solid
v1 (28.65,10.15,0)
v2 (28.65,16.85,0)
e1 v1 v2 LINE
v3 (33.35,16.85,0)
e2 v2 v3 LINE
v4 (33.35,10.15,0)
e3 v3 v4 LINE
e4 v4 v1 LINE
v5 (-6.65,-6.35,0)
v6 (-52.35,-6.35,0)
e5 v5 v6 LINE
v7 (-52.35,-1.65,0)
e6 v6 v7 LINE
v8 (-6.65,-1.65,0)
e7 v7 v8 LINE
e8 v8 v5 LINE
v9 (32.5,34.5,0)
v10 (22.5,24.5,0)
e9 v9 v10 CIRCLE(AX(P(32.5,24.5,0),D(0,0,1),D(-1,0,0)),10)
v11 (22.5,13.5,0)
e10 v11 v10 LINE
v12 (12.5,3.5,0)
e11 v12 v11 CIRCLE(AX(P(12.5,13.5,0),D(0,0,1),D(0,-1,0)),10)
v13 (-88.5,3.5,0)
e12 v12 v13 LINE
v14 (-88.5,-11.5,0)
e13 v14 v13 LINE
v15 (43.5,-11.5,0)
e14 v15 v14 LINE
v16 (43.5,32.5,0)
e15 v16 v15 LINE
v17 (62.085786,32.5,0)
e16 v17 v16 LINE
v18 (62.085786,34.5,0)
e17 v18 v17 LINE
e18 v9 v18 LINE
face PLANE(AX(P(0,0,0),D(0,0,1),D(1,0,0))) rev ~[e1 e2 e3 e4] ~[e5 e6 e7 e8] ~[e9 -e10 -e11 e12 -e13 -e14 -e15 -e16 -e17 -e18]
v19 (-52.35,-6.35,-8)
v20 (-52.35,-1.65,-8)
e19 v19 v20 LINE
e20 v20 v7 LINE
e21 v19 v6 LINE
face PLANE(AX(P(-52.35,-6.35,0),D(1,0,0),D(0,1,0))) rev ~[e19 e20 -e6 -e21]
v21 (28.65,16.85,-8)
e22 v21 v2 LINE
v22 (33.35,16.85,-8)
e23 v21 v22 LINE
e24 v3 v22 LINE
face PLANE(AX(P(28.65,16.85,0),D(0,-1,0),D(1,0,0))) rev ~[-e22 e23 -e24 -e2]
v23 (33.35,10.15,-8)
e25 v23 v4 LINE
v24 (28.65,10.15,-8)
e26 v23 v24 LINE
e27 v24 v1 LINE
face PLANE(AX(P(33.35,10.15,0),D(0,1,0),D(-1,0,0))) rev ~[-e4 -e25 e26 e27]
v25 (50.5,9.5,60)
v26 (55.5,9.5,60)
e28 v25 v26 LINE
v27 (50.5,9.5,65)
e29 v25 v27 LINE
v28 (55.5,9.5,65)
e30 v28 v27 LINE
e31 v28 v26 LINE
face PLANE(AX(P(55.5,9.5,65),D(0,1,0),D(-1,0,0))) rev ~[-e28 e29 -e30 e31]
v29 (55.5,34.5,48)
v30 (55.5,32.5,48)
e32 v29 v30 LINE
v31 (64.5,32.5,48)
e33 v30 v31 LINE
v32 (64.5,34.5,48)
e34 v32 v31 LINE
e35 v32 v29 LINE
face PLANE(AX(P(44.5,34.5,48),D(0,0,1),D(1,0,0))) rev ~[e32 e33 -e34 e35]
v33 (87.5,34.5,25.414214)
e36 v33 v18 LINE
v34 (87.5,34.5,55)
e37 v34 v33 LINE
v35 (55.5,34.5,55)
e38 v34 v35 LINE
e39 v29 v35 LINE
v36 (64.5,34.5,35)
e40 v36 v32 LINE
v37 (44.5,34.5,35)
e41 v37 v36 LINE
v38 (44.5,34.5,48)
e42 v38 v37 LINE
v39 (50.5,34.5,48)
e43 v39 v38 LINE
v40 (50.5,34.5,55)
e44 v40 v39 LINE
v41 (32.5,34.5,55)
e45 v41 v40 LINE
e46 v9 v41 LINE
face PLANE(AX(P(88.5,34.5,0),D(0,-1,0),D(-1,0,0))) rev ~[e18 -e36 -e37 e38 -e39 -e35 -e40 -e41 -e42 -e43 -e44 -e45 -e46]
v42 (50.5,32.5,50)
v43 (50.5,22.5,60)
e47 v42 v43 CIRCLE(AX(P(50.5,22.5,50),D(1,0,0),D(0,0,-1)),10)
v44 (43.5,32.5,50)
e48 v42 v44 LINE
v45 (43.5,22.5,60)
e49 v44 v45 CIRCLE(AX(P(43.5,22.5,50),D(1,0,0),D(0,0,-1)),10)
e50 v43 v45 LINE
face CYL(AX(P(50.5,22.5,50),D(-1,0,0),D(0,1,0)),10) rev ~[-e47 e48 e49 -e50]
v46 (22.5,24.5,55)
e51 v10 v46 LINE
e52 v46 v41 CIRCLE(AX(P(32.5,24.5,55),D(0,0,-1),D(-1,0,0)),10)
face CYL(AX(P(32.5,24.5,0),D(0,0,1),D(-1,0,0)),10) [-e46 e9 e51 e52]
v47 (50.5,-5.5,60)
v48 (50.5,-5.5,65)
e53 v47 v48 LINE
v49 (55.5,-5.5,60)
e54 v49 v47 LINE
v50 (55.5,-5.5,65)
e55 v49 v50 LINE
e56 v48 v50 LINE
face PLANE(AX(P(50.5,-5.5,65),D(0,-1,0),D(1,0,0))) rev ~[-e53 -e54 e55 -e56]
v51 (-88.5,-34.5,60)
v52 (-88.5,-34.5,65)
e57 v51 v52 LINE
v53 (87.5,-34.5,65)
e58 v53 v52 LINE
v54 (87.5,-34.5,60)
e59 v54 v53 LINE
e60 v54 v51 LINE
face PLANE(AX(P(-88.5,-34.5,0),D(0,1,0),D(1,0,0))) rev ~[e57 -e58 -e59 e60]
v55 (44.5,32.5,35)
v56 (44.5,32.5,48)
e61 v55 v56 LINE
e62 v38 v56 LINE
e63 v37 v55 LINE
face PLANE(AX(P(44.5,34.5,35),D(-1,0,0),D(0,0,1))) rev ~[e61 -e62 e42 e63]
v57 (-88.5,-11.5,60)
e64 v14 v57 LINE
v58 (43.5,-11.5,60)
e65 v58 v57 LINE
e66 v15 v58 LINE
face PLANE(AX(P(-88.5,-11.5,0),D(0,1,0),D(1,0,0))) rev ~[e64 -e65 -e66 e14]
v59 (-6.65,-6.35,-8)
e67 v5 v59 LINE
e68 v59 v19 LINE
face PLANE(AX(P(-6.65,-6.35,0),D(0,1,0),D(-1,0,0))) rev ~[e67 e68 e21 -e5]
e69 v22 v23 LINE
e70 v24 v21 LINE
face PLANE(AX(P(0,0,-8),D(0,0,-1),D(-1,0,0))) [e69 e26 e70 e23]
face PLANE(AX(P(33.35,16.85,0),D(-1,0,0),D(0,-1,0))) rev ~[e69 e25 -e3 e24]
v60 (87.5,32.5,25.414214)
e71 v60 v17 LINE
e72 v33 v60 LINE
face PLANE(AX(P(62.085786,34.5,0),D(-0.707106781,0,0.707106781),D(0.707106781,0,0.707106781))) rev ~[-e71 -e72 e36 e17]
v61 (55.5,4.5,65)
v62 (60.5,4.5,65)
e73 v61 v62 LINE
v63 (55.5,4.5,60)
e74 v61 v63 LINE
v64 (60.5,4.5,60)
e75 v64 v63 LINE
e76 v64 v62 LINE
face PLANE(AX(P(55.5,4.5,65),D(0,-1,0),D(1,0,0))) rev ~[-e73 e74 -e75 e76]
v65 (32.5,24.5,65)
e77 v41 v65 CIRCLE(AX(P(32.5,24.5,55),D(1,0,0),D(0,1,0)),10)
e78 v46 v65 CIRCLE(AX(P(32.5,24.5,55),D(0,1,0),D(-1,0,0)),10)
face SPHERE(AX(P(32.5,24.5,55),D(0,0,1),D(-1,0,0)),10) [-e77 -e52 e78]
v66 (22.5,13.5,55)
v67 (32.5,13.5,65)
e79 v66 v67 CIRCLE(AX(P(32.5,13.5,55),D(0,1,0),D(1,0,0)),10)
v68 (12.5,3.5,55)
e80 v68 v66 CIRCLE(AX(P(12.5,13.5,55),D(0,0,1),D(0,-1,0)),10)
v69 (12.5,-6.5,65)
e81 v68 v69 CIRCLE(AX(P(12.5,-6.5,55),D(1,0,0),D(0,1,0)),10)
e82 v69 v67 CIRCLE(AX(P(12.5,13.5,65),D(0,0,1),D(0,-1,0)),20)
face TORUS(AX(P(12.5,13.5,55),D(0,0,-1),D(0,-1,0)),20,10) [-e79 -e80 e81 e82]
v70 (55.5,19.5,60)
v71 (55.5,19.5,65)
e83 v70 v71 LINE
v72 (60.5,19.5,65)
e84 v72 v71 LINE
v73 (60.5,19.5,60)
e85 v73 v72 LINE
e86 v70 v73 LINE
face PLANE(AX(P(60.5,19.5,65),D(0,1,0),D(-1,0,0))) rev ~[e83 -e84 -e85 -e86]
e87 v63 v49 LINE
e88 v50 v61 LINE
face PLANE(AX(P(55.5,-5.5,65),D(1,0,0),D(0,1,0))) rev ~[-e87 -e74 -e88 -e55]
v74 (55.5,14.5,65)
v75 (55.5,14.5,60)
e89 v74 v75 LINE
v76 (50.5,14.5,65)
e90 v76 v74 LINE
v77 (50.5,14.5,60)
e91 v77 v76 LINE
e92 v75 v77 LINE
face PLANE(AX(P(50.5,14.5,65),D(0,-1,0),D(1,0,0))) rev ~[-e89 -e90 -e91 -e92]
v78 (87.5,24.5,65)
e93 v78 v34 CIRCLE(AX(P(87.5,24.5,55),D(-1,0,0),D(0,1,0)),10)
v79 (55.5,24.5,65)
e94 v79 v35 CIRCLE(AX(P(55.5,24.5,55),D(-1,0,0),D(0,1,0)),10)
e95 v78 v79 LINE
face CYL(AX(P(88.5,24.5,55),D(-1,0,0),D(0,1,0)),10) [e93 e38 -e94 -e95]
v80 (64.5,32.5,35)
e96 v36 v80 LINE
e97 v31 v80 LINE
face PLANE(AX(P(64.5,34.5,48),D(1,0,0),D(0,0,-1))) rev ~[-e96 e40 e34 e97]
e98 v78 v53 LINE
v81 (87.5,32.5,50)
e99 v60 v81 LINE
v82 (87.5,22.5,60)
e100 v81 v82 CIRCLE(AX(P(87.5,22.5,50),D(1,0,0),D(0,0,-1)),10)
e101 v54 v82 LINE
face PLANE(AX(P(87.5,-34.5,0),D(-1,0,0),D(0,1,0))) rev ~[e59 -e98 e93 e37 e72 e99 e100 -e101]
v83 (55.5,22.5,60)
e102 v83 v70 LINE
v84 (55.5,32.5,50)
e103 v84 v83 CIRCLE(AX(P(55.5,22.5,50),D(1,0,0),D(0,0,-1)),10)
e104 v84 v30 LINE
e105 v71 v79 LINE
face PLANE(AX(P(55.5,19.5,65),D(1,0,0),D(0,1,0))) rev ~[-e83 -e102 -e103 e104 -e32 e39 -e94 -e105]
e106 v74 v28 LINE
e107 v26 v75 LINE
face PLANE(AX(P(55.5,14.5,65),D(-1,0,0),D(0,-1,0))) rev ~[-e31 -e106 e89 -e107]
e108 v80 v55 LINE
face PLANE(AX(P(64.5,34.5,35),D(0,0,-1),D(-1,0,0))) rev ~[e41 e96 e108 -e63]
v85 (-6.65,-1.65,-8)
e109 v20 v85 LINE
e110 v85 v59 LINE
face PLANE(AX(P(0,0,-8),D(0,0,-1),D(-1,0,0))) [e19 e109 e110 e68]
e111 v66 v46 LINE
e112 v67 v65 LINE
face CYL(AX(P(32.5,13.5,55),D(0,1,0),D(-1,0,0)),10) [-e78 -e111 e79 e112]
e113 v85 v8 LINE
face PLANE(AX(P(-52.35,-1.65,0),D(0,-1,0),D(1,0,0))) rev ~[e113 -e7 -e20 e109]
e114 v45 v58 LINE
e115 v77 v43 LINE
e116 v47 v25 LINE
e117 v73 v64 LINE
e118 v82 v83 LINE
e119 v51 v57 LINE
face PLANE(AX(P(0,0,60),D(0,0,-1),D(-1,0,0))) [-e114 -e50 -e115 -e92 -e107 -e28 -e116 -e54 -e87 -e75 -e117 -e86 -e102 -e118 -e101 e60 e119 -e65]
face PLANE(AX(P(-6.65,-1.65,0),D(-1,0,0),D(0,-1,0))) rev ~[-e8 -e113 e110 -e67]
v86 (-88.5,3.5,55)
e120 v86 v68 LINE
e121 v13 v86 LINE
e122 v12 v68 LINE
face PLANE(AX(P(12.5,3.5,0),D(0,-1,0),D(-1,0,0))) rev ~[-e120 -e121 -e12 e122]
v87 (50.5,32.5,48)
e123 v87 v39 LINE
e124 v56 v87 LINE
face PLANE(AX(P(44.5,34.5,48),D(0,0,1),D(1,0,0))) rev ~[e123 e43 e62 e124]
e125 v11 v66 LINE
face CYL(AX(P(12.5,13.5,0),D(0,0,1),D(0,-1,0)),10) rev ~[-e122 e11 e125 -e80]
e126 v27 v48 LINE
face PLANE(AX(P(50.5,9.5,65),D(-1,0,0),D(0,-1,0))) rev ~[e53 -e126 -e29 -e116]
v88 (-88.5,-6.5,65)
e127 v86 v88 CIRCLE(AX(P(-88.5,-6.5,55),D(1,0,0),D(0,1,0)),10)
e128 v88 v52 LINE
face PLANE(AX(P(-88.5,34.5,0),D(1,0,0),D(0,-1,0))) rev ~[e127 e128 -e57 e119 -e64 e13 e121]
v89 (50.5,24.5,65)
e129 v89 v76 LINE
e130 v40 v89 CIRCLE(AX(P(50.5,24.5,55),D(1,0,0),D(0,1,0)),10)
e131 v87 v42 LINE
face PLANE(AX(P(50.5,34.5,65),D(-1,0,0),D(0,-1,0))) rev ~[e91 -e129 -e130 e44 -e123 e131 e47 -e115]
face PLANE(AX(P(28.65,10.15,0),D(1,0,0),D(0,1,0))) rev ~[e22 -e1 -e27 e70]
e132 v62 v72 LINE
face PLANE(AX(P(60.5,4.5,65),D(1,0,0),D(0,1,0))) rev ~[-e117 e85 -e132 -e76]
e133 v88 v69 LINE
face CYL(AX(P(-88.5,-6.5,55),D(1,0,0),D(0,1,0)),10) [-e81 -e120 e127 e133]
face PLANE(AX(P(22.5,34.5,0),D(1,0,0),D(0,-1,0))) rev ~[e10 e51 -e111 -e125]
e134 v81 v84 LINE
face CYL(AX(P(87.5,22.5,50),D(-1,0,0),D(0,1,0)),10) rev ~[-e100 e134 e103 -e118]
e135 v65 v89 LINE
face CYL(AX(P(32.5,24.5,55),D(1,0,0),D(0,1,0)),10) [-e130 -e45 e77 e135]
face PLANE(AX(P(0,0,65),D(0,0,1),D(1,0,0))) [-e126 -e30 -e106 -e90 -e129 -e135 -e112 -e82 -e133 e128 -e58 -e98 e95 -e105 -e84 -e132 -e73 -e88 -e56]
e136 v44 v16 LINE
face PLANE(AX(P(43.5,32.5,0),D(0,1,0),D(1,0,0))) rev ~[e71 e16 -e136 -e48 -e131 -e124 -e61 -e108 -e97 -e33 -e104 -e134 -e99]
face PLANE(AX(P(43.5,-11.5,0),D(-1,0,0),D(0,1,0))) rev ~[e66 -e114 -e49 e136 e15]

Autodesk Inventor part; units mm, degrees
ref_plane "YZ Plane" through (0, 0, 0) normal (1, 0, 0) x (0, 1, 0)
ref_plane "XZ Plane" through (0, 0, 0) normal (0, 1, 0) x (-1, 0, 0)
ref_plane "XY Plane" through (0, 0, 0) normal (0, 0, 1) x (1, 0, 0)
sketch "Sketch1" plane through (0, 0, 0) normal (0, 0, 1) x (1, 0, 0)
  line L0 (-88.5, 34.5) -> (88.5, 34.5)
  line L1 (88.5, 34.5) -> (88.5, -34.5)
  line L2 (88.5, -34.5) -> (-88.5, -34.5)
  line L3 (-88.5, -34.5) -> (-88.5, 34.5)
  point P0 (0, 0)
  point P1 (-88.5, 0)
  point P2 (0, 34.5)
  dimension "d0" = 177
  dimension "d1" = 69
sketch "Sketch1 outline for Extrusion1" plane through (0, 0, 0) normal (0, 0, 1) x (1, 0, 0)
  line L0 (-88.5, -34.5) -> (88.5, -34.5)
  line L1 (-88.5, 34.5) -> (-88.5, -34.5)
  line L2 (88.5, 34.5) -> (-88.5, 34.5)
  line L3 (88.5, -34.5) -> (88.5, 34.5)
extrude "Extrusion1" add sketch "Sketch1 outline for Extrusion1" along normal blind 65
sketch "Sketch2" plane through (0, 0, 0) normal (0, 0, -1) x (-1, 0, 0)
  line L0 (232.5, 3.5) -> (-12.5, 3.5) projected
  line L1 (88.5, 34.5) -> (88.5, -34.5) projected
  line L2 (-88.5, 34.5) -> (88.5, 34.5) projected
  line L3 (-22.5, 34.5) -> (-22.5, 3.5)
  line L4 (-22.5, 13.5) -> (-22.5, 24.5) projected
  line L5 (-12.5, 3.5) -> (-22.5, 3.5)
  point P0 (0, 0)
  point P1 (88.5, 3.5)
sketch "Sketch2 outline for Extrusion2" plane through (0, 0, 0) normal (0, 0, -1) x (-1, 0, 0)
  line L0 (-22.5, 3.5) -> (-12.5, 3.5)
  line L1 (-22.5, 34.5) -> (-22.5, 3.5)
  line L2 (88.5, 34.5) -> (-22.5, 34.5)
  line L3 (88.5, 3.5) -> (88.5, 34.5)
  line L4 (-12.5, 3.5) -> (88.5, 3.5)
extrude "Extrusion2" cut sketch "Sketch2 outline for Extrusion2" against normal through all
fillet "Fillet1" radius 10 2 edges at (22.5, 3.5, 32.5) (22.5, 34.5, 32.5)
sketch "Sketch3" plane through (0, 0, 0) normal (0, 0, -1) x (-1, 0, 0)
  line L0 (-43.5, -11.5) -> (216.5, -11.5) projected
  line L1 (-43.5, 32.5) -> (-43.5, -11.5) projected
  line L2 (-90.5, 32.5) -> (-43.5, 32.5) projected
  line L3 (-88.5, 32.5) -> (-88.5, -34.5)
  line L4 (-88.5, -34.5) -> (88.5, -34.5)
  line L5 (88.5, -34.5) -> (88.5, -11.5)
  line L6 (88.5, 3.5) -> (88.5, -34.5) projected
  line L7 (88.5, -34.5) -> (-88.5, -34.5) projected
  line L8 (-88.5, -34.5) -> (-88.5, 34.5) projected
  point P0 (0, 0)
sketch "Sketch3 outline for Extrusion3" plane through (0, 0, 0) normal (0, 0, -1) x (-1, 0, 0)
  line L0 (-43.5, -11.5) -> (-43.5, 32.5)
  line L1 (88.5, -11.5) -> (-43.5, -11.5)
  line L2 (88.5, -34.5) -> (88.5, -11.5)
  line L3 (-88.5, -34.5) -> (88.5, -34.5)
  line L4 (-88.5, 32.5) -> (-88.5, -34.5)
  line L5 (-43.5, 32.5) -> (-88.5, 32.5)
extrude "Extrusion3" cut sketch "Sketch3 outline for Extrusion3" against normal blind 60
sketch "Sketch4" plane through (88.5, 34.5, 65) normal (0, 1, 0) x (1, 0, 0)
  line L0 (0, 65) -> (-56, 65)
  line L1 (0, 65) -> (0, 0)
  line L2 (0, 40) -> (-25, 65)
  line L3 (0, 38.585786) -> (-26.414214, 65)
  point P0 (-88.5, 65)
  dimension "d40" = 1
sketch "Sketch4 outline for Extrusion4" plane through (88.5, 34.5, 65) normal (0, 1, 0) x (1, 0, 0)
  line L0 (0, 65) -> (-26.414214, 65)
  line L1 (-26.414214, 65) -> (0, 38.585786)
  line L2 (0, 38.585786) -> (0, 65)
extrude "Extrusion4" cut sketch "Sketch4 outline for Extrusion4" against normal blind 60
sketch "Sketch5" plane through (0, 0, 65) normal (0, 0, 1) x (1, 0, 0)
  line L0 (50.5, -5.5) -> (55.5, -5.5)
  line L1 (55.5, -5.5) -> (55.5, 9.5)
  line L2 (55.5, 9.5) -> (50.5, 9.5)
  line L3 (50.5, 9.5) -> (50.5, -5.5)
  line L4 (-88.5, -34.5) -> (88.5, -34.5) projected
  line L5 (88.5, -34.5) -> (88.5, 34.5) projected
  line L6 (55.5, 9.5) -> (60.5, 9.5)
  line L7 (60.5, 9.5) -> (60.5, 4.5)
  line L8 (60.5, 4.5) -> (55.5, 4.5)
  line L9 (55.5, 4.5) -> (55.5, 9.5)
  line L10 (55.5, 19.5) -> (60.5, 19.5)
  line L11 (60.5, 19.5) -> (60.5, 9.5)
  line L12 (60.5, 9.5) -> (55.5, 9.5)
  line L13 (55.5, 9.5) -> (55.5, 19.5)
  line L14 (50.5, 19.5) -> (55.5, 19.5)
  line L15 (55.5, 19.5) -> (55.5, 14.5)
  line L16 (55.5, 14.5) -> (50.5, 14.5)
  line L17 (50.5, 14.5) -> (50.5, 19.5)
  line L18 (50.5, 34.5) -> (55.5, 34.5)
  line L19 (55.5, 34.5) -> (55.5, 19.5)
  line L20 (55.5, 19.5) -> (50.5, 19.5)
  line L21 (50.5, 19.5) -> (50.5, 34.5)
  line L22 (88.5, 34.5) -> (32.5, 34.5) projected
  point P0 (0, 0)
  dimension "d11" = 5
  dimension "d13" = 33
  dimension "d20" = 5
  dimension "d21" = 10
  dimension "d23" = 15
  dimension "d24" = 15
sketch "Sketch5 outline for Extrusion5" plane through (0, 0, 65) normal (0, 0, 1) x (1, 0, 0)
  line L0 (55.5, 9.5) -> (50.5, 9.5)
  line L1 (50.5, 9.5) -> (50.5, -5.5)
  line L2 (50.5, -5.5) -> (55.5, -5.5)
  line L3 (55.5, -5.5) -> (55.5, 4.5)
  line L4 (55.5, 4.5) -> (60.5, 4.5)
  line L5 (60.5, 4.5) -> (60.5, 19.5)
  line L6 (60.5, 19.5) -> (55.5, 19.5)
  line L7 (55.5, 19.5) -> (55.5, 34.5)
  line L8 (55.5, 34.5) -> (50.5, 34.5)
  line L9 (50.5, 34.5) -> (50.5, 14.5)
  line L10 (50.5, 14.5) -> (55.5, 14.5)
  line L11 (55.5, 14.5) -> (55.5, 9.5)
extrude "Extrusion5" cut sketch "Sketch5 outline for Extrusion5" against normal blind 30
sketch "Sketch6" plane through (0, 0, 0) normal (0, 0, -1) x (-1, 0, 0)
  line L0 (-28.5, 18.5) -> (-33.5, 18.5) projected
  line L1 (-33.5, 18.5) -> (-33.5, 8.5) projected
  line L2 (-28.5, 8.5) -> (-28.5, 18.5) projected
  line L3 (-33.5, 8.5) -> (-28.5, 8.5) projected
  line L4 (54.5, -1.5) -> (4.5, -1.5) projected
  line L5 (4.5, -1.5) -> (4.5, -6.5) projected
  line L6 (4.5, -6.5) -> (54.5, -6.5) projected
  line L7 (54.5, -6.5) -> (54.5, -1.5) projected
  line L8 (4.65, -1.65) -> (54.35, -1.65)
  line L9 (54.35, -1.65) -> (54.35, -6.35)
  line L10 (54.35, -6.35) -> (4.65, -6.35)
  line L11 (4.65, -6.35) -> (4.65, -1.65)
  line L12 (-33.35, 8.65) -> (-33.35, 18.35)
  line L13 (-33.35, 18.35) -> (-28.65, 18.35)
  line L14 (-28.65, 18.35) -> (-28.65, 8.65)
  line L15 (-28.65, 8.65) -> (-33.35, 8.65)
  line L16 (-33.35, 16.85) -> (-28.65, 16.85)
  line L17 (-33.35, 10.15) -> (-28.65, 10.15)
  line L18 (6.65, -6.35) -> (6.65, -1.65)
  line L19 (52.35, -6.35) -> (52.35, -1.65)
  point P0 (0, 0)
  dimension "d17" = 0.15
  dimension "d35" = 0.15
  dimension "d36" = 1.5
  dimension "d37" = 1.5
  dimension "d38" = 2
  dimension "d39" = 2
sketch "Sketch6 outline for Extrusion6" plane through (0, 0, 0) normal (0, 0, -1) x (-1, 0, 0)
  line L0 (-33.35, 10.15) -> (-28.65, 10.15)
  line L1 (-33.35, 16.85) -> (-33.35, 10.15)
  line L2 (-28.65, 16.85) -> (-33.35, 16.85)
  line L3 (-28.65, 10.15) -> (-28.65, 16.85)
  line L4 (52.35, -6.35) -> (52.35, -1.65)
  line L5 (6.65, -6.35) -> (52.35, -6.35)
  line L6 (6.65, -1.65) -> (6.65, -6.35)
  line L7 (52.35, -1.65) -> (6.65, -1.65)
extrude "Extrusion6" add sketch "Sketch6 outline for Extrusion6" along normal blind 8
fillet "Fillet2" radius 10 6 edges at (72, 34.5, 65) (25.4289, 31.5711, 65) (22.5, 19, 65) (19.5711, 6.4289, 65) (-38, 3.5, 65) (41.5, 34.5, 65)
sketch "Sketch7" plane through (32.5, 34.5, 0) normal (0, 1, 0) x (1, 0, 0)
  line L0 (32, -48) -> (12, -48)
  line L1 (12, -48) -> (12, -35)
  line L2 (12, -35) -> (32, -35)
  line L3 (32, -35) -> (32, -48)
  line L4 (18, -35) -> (23, -35) projected
  point P0 (-32.5, 0)
  point P1 (20.5, -35)
  dimension "d26" = 20
  dimension "d27" = 13
sketch "Sketch7 outline for Extrusion7" plane through (32.5, 34.5, 0) normal (0, 1, 0) x (1, 0, 0)
  line L0 (12, -35) -> (12, -48)
  line L1 (32, -35) -> (12, -35)
  line L2 (32, -48) -> (32, -35)
  line L3 (12, -48) -> (32, -48)
extrude "Extrusion7" cut sketch "Sketch7 outline for Extrusion7" against normal blind 30
move faces "Move1" translate (-1, 0, 0) faces at (88.5, 7.5, 61.666667)
fillet "Fillet3" radius 10 2 edges at (71.5, 32.5, 60) (47, 32.5, 60)
properties part number "0008-30-011"
